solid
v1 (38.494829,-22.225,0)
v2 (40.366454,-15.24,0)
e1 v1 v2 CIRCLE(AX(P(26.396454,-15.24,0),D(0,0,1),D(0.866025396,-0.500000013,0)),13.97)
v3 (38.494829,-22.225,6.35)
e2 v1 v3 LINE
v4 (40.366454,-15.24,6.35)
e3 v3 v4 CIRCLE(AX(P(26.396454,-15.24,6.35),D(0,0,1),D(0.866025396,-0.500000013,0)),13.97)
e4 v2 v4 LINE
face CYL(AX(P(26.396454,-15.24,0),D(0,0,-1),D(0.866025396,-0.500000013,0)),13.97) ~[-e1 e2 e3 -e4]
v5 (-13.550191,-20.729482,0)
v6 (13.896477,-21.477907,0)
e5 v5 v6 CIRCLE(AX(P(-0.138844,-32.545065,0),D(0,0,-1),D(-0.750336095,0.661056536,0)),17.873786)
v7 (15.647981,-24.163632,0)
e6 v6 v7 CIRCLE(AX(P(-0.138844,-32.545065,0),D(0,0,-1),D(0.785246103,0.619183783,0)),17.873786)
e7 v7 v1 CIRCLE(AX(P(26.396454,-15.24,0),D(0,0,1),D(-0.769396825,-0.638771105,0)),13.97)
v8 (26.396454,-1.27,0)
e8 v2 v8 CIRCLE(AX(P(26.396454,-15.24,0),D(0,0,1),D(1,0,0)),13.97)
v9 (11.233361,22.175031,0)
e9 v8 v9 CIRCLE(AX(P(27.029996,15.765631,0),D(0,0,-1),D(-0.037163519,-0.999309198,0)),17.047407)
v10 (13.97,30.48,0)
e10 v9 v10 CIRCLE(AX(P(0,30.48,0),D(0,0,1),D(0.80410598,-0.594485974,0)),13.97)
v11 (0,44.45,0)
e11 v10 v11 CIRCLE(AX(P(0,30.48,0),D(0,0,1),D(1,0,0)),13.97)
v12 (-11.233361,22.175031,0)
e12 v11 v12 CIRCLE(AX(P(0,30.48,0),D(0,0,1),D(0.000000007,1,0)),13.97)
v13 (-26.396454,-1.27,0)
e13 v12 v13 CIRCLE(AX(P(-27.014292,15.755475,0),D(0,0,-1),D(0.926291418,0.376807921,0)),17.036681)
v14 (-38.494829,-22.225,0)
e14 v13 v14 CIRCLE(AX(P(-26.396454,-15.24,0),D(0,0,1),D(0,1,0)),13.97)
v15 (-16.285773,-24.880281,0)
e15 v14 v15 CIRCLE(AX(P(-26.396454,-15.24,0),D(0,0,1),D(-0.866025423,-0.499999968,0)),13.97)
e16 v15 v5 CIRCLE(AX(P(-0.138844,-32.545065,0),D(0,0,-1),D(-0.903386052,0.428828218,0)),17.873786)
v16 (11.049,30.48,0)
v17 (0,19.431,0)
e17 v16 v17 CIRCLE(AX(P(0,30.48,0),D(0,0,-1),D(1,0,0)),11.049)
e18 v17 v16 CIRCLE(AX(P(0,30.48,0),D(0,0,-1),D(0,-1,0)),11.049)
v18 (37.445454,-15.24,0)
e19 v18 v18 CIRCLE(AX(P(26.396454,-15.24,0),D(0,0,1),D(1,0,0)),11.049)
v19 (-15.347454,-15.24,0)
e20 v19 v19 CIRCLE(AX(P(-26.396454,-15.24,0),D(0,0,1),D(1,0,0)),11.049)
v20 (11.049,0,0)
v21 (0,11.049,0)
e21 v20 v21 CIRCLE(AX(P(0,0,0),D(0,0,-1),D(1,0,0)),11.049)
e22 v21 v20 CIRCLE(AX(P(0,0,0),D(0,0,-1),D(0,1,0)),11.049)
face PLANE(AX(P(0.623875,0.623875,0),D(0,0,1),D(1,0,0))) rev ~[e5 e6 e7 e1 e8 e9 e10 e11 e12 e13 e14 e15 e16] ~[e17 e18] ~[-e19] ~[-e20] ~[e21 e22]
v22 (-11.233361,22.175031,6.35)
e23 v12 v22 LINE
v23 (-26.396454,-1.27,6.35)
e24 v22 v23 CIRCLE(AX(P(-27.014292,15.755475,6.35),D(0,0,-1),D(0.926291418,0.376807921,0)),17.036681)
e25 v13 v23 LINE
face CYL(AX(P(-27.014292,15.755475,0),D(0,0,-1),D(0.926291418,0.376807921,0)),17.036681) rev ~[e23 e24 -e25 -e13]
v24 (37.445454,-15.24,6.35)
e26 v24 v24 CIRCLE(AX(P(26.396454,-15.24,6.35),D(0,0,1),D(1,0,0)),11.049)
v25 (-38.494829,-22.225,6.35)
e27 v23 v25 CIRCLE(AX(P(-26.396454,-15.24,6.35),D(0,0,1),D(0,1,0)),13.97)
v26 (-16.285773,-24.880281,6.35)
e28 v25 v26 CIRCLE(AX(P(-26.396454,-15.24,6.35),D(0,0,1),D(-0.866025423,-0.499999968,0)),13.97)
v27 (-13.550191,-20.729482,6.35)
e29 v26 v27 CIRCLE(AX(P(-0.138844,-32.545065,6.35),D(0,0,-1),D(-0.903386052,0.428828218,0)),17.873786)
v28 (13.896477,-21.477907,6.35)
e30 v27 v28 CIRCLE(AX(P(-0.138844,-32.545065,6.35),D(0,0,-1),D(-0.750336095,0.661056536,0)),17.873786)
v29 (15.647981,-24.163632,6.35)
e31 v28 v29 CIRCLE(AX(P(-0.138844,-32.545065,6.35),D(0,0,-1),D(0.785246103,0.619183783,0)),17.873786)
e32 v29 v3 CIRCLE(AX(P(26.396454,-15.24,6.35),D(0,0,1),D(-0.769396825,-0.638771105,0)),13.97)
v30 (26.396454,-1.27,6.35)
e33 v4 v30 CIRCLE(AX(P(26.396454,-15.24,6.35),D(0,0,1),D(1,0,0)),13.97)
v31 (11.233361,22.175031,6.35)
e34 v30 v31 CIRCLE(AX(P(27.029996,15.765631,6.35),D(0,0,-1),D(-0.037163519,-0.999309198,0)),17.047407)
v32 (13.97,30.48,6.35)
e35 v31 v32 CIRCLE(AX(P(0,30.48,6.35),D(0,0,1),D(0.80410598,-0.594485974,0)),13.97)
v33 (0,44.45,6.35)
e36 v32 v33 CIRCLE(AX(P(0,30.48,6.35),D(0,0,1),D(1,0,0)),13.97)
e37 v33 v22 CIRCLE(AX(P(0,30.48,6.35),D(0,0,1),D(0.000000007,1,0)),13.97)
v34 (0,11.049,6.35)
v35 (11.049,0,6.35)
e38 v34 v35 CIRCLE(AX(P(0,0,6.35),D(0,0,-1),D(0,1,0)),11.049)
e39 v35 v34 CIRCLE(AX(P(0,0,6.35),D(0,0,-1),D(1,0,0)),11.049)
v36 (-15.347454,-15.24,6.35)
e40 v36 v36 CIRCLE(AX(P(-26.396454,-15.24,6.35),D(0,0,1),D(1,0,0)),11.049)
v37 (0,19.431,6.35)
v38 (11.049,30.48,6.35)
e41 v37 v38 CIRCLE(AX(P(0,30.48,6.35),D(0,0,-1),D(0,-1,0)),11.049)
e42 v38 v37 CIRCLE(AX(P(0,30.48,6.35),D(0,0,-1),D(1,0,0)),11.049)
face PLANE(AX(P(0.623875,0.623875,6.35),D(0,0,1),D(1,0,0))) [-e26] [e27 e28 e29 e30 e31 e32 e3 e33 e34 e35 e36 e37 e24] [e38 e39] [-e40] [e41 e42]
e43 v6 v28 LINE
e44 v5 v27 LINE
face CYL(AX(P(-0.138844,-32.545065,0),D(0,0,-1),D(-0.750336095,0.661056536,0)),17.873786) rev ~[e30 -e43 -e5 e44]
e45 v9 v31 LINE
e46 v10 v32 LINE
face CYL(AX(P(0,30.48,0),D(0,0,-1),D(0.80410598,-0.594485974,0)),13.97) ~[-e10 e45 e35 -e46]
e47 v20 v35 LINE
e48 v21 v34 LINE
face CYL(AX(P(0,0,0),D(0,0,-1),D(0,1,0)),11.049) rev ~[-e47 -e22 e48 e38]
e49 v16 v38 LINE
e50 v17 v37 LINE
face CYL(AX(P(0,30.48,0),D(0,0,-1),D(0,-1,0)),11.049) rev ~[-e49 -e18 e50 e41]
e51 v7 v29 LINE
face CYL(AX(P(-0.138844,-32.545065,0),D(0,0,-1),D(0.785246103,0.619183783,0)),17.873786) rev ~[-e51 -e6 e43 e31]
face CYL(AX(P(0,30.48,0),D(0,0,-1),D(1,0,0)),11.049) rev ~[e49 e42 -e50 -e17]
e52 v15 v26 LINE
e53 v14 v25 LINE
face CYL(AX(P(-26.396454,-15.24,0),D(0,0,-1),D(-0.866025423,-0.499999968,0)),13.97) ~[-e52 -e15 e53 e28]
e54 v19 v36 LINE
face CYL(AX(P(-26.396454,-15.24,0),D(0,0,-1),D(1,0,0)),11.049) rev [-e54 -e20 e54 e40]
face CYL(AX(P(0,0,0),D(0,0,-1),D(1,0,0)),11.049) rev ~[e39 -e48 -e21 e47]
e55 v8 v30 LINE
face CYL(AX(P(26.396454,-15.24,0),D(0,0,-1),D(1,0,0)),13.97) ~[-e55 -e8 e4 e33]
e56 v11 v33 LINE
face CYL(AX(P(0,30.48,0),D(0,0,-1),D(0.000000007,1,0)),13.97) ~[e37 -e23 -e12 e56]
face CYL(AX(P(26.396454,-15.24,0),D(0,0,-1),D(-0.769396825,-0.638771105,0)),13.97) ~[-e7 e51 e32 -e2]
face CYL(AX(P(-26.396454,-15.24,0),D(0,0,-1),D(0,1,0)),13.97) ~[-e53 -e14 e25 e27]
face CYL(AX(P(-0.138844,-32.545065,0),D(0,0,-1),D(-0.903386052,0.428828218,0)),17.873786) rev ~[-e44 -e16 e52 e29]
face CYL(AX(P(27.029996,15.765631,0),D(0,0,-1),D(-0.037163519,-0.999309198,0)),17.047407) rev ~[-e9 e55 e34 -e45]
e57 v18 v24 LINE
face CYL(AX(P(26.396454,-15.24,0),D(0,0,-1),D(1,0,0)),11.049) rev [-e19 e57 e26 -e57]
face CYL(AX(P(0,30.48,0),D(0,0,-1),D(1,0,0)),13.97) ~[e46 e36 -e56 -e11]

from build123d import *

# Parameters (mm, degrees)
F1_R     = 11.049
F2_DEPTH = 6.35
F4_DEPTH = 6.35
F0_R     = 44.45
F0_R_2   = 11.049
F5_DEPTH = 113
F7_DEPTH = 6.351


# Not quite as in the source:
# - an extrude ends at something that could not be found from the text; its depth is read off the source's solid


with BuildPart() as f2:
    # F1 (on face) → F2 (new body)
    with BuildSketch(Plane.XY):
        with BuildLine():
            ThreePointArc((11.2333605356, 22.1750309406), (6.2904881464, 18.0064015264), (0, 16.51))
            ThreePointArc((0, 16.51), (-6.2904881464, 18.0064015264), (-11.2333605356, 22.1750309406))
            ThreePointArc((-11.2333605356, 22.1750309406), (-12.7087939307, 6.5033813584), (-26.3964543073, -1.27))
            ThreePointArc((-26.3964543073, -1.27), (-16.5181725742, -5.3617182668), (-12.4264543073, -15.24))
            ThreePointArc((-12.4264543073, -15.24), (-12.7102714474, -18.0416599946), (-13.5501907032, -20.7294818894))
            ThreePointArc((-13.5501907032, -20.7294818894), (0.3483634498, -14.677920264), (13.8964774264, -21.477906538))
            ThreePointArc((13.8964774264, -21.477906538), (14.5157040294, -7.8909406838), (26.3964543073, -1.27))
            ThreePointArc((26.3964543073, -1.27), (12.7154911257, 6.507712775), (11.2333605356, 22.1750309406))
        make_face()
        with BuildLine():
            ThreePointArc((0, 13.97), (9.8782817332, 9.8782817332), (13.97, 0))
            ThreePointArc((13.97, 0), (-9.8782817332, -9.8782817332), (0, 13.97))
        make_face(mode=Mode.SUBTRACT)
        with BuildLine():
            ThreePointArc((-11.2333605356, 22.1750309406), (-6.2904881464, 18.0064015264), (0, 16.51))
            ThreePointArc((0, 16.51), (6.2904881464, 18.0064015264), (11.2333605356, 22.1750309406))
            ThreePointArc((11.2333605356, 22.1750309406), (13.2682128918, 26.1078807588), (13.97, 30.48))
            ThreePointArc((13.97, 30.48), (9.8782817686, 40.3582816978), (1.001e-07, 44.45))
            ThreePointArc((1.001e-07, 44.45), (-12.473598451, 36.7704881911), (-11.2333605356, 22.1750309406))
        make_face()
        with BuildLine():
            ThreePointArc((11.049, 30.48), (7.8128228253, 22.6671771747), (0, 19.431))
            ThreePointArc((0, 19.431), (-7.8128228253, 38.2928228253), (11.049, 30.48))
        make_face(mode=Mode.SUBTRACT)
        with BuildLine():
            ThreePointArc((-12.4264543073, -15.24), (-16.5181725742, -5.3617182668), (-26.3964543073, -1.27))
            ThreePointArc((-26.3964543073, -1.27), (-38.4948290673, -8.2549997732), (-38.4948294602, -22.2249995463))
            ThreePointArc((-38.4948294602, -22.2249995463), (-28.0548757974, -29.11121257), (-16.2857729321, -24.8802812266))
            ThreePointArc((-16.2857729321, -24.8802812266), (-15.0629921605, -22.709312564), (-13.5501907032, -20.7294818894))
            ThreePointArc((-13.5501907032, -20.7294818894), (-12.7102714474, -18.0416599946), (-12.4264543073, -15.24))
        make_face()
        with Locations((-26.3964543073, -15.24)):
            Circle(F1_R, mode=Mode.SUBTRACT)
        with BuildLine():
            ThreePointArc((40.3664543073, -15.24), (36.2747360405, -5.3617182668), (26.3964543073, -1.27))
            ThreePointArc((26.3964543073, -1.27), (14.5157040294, -7.8909406838), (13.8964774264, -21.477906538))
            ThreePointArc((13.8964774264, -21.477906538), (14.8325747733, -22.7814148116), (15.6479806578, -24.1636323436))
            ThreePointArc((15.6479806578, -24.1636323436), (27.5776113359, -29.1599773015), (38.4948290898, -22.2250001877))
            ThreePointArc((38.4948290898, -22.2250001877), (39.8904380726, -18.8557021648), (40.3664543073, -15.24))
        make_face()
        with Locations((26.3964543073, -15.24)):
            Circle(F1_R, mode=Mode.SUBTRACT)
    extrude(amount=F2_DEPTH)

    # F3 (on face) → F4 (join)
    with BuildSketch(Plane.XY):
        with BuildLine():
            ThreePointArc((0, 13.97), (-9.8782817332, -9.8782817332), (13.97, 0))
            ThreePointArc((13.97, 0), (9.8782817332, 9.8782817332), (0, 13.97))
        make_face()
        with BuildLine():
            ThreePointArc((11.049, 0), (-7.8128228253, -7.8128228253), (0, 11.049))
            ThreePointArc((0, 11.049), (7.8128228253, 7.8128228253), (11.049, 0))
        make_face(mode=Mode.SUBTRACT)
    extrude(amount=F4_DEPTH)

    # F0 (on Top) → F5 (cut, through all)
    with BuildSketch(Plane.XY):
        Circle(F0_R)
        with Locations((-26.3964543073, -15.24)):
            Circle(F0_R_2, mode=Mode.SUBTRACT)
        with Locations((26.3964543073, -15.24)):
            Circle(F0_R_2, mode=Mode.SUBTRACT)
        with BuildLine():
            ThreePointArc((0, 11.049), (7.8128228253, 7.8128228253), (11.049, 0))
            ThreePointArc((11.049, 0), (-7.8128228253, -7.8128228253), (0, 11.049))
        make_face(mode=Mode.SUBTRACT)
        with BuildLine():
            ThreePointArc((11.049, 30.48), (7.8128228253, 22.6671771747), (0, 19.431))
            ThreePointArc((0, 19.431), (-7.8128228253, 38.2928228253), (11.049, 30.48))
        make_face(mode=Mode.SUBTRACT)
    extrude(amount=-F5_DEPTH, mode=Mode.SUBTRACT)

    # F6 (on face) → F7 (cut, through all)
    with BuildSketch(Plane.XY.offset(6.35)):
        with BuildLine():
            Line((-26.3964543073, 15.7554745193), (-26.3964543073, -1.27))
            ThreePointArc((-26.3964543073, -1.27), (-12.7087939307, 6.5033813584), (-11.2333605356, 22.1750309406))
            Line((-11.2333605356, 22.1750309406), (-26.3964543073, 15.7554745193))
        make_face()
    extrude(amount=-F7_DEPTH, mode=Mode.SUBTRACT)


solid = f2.part
